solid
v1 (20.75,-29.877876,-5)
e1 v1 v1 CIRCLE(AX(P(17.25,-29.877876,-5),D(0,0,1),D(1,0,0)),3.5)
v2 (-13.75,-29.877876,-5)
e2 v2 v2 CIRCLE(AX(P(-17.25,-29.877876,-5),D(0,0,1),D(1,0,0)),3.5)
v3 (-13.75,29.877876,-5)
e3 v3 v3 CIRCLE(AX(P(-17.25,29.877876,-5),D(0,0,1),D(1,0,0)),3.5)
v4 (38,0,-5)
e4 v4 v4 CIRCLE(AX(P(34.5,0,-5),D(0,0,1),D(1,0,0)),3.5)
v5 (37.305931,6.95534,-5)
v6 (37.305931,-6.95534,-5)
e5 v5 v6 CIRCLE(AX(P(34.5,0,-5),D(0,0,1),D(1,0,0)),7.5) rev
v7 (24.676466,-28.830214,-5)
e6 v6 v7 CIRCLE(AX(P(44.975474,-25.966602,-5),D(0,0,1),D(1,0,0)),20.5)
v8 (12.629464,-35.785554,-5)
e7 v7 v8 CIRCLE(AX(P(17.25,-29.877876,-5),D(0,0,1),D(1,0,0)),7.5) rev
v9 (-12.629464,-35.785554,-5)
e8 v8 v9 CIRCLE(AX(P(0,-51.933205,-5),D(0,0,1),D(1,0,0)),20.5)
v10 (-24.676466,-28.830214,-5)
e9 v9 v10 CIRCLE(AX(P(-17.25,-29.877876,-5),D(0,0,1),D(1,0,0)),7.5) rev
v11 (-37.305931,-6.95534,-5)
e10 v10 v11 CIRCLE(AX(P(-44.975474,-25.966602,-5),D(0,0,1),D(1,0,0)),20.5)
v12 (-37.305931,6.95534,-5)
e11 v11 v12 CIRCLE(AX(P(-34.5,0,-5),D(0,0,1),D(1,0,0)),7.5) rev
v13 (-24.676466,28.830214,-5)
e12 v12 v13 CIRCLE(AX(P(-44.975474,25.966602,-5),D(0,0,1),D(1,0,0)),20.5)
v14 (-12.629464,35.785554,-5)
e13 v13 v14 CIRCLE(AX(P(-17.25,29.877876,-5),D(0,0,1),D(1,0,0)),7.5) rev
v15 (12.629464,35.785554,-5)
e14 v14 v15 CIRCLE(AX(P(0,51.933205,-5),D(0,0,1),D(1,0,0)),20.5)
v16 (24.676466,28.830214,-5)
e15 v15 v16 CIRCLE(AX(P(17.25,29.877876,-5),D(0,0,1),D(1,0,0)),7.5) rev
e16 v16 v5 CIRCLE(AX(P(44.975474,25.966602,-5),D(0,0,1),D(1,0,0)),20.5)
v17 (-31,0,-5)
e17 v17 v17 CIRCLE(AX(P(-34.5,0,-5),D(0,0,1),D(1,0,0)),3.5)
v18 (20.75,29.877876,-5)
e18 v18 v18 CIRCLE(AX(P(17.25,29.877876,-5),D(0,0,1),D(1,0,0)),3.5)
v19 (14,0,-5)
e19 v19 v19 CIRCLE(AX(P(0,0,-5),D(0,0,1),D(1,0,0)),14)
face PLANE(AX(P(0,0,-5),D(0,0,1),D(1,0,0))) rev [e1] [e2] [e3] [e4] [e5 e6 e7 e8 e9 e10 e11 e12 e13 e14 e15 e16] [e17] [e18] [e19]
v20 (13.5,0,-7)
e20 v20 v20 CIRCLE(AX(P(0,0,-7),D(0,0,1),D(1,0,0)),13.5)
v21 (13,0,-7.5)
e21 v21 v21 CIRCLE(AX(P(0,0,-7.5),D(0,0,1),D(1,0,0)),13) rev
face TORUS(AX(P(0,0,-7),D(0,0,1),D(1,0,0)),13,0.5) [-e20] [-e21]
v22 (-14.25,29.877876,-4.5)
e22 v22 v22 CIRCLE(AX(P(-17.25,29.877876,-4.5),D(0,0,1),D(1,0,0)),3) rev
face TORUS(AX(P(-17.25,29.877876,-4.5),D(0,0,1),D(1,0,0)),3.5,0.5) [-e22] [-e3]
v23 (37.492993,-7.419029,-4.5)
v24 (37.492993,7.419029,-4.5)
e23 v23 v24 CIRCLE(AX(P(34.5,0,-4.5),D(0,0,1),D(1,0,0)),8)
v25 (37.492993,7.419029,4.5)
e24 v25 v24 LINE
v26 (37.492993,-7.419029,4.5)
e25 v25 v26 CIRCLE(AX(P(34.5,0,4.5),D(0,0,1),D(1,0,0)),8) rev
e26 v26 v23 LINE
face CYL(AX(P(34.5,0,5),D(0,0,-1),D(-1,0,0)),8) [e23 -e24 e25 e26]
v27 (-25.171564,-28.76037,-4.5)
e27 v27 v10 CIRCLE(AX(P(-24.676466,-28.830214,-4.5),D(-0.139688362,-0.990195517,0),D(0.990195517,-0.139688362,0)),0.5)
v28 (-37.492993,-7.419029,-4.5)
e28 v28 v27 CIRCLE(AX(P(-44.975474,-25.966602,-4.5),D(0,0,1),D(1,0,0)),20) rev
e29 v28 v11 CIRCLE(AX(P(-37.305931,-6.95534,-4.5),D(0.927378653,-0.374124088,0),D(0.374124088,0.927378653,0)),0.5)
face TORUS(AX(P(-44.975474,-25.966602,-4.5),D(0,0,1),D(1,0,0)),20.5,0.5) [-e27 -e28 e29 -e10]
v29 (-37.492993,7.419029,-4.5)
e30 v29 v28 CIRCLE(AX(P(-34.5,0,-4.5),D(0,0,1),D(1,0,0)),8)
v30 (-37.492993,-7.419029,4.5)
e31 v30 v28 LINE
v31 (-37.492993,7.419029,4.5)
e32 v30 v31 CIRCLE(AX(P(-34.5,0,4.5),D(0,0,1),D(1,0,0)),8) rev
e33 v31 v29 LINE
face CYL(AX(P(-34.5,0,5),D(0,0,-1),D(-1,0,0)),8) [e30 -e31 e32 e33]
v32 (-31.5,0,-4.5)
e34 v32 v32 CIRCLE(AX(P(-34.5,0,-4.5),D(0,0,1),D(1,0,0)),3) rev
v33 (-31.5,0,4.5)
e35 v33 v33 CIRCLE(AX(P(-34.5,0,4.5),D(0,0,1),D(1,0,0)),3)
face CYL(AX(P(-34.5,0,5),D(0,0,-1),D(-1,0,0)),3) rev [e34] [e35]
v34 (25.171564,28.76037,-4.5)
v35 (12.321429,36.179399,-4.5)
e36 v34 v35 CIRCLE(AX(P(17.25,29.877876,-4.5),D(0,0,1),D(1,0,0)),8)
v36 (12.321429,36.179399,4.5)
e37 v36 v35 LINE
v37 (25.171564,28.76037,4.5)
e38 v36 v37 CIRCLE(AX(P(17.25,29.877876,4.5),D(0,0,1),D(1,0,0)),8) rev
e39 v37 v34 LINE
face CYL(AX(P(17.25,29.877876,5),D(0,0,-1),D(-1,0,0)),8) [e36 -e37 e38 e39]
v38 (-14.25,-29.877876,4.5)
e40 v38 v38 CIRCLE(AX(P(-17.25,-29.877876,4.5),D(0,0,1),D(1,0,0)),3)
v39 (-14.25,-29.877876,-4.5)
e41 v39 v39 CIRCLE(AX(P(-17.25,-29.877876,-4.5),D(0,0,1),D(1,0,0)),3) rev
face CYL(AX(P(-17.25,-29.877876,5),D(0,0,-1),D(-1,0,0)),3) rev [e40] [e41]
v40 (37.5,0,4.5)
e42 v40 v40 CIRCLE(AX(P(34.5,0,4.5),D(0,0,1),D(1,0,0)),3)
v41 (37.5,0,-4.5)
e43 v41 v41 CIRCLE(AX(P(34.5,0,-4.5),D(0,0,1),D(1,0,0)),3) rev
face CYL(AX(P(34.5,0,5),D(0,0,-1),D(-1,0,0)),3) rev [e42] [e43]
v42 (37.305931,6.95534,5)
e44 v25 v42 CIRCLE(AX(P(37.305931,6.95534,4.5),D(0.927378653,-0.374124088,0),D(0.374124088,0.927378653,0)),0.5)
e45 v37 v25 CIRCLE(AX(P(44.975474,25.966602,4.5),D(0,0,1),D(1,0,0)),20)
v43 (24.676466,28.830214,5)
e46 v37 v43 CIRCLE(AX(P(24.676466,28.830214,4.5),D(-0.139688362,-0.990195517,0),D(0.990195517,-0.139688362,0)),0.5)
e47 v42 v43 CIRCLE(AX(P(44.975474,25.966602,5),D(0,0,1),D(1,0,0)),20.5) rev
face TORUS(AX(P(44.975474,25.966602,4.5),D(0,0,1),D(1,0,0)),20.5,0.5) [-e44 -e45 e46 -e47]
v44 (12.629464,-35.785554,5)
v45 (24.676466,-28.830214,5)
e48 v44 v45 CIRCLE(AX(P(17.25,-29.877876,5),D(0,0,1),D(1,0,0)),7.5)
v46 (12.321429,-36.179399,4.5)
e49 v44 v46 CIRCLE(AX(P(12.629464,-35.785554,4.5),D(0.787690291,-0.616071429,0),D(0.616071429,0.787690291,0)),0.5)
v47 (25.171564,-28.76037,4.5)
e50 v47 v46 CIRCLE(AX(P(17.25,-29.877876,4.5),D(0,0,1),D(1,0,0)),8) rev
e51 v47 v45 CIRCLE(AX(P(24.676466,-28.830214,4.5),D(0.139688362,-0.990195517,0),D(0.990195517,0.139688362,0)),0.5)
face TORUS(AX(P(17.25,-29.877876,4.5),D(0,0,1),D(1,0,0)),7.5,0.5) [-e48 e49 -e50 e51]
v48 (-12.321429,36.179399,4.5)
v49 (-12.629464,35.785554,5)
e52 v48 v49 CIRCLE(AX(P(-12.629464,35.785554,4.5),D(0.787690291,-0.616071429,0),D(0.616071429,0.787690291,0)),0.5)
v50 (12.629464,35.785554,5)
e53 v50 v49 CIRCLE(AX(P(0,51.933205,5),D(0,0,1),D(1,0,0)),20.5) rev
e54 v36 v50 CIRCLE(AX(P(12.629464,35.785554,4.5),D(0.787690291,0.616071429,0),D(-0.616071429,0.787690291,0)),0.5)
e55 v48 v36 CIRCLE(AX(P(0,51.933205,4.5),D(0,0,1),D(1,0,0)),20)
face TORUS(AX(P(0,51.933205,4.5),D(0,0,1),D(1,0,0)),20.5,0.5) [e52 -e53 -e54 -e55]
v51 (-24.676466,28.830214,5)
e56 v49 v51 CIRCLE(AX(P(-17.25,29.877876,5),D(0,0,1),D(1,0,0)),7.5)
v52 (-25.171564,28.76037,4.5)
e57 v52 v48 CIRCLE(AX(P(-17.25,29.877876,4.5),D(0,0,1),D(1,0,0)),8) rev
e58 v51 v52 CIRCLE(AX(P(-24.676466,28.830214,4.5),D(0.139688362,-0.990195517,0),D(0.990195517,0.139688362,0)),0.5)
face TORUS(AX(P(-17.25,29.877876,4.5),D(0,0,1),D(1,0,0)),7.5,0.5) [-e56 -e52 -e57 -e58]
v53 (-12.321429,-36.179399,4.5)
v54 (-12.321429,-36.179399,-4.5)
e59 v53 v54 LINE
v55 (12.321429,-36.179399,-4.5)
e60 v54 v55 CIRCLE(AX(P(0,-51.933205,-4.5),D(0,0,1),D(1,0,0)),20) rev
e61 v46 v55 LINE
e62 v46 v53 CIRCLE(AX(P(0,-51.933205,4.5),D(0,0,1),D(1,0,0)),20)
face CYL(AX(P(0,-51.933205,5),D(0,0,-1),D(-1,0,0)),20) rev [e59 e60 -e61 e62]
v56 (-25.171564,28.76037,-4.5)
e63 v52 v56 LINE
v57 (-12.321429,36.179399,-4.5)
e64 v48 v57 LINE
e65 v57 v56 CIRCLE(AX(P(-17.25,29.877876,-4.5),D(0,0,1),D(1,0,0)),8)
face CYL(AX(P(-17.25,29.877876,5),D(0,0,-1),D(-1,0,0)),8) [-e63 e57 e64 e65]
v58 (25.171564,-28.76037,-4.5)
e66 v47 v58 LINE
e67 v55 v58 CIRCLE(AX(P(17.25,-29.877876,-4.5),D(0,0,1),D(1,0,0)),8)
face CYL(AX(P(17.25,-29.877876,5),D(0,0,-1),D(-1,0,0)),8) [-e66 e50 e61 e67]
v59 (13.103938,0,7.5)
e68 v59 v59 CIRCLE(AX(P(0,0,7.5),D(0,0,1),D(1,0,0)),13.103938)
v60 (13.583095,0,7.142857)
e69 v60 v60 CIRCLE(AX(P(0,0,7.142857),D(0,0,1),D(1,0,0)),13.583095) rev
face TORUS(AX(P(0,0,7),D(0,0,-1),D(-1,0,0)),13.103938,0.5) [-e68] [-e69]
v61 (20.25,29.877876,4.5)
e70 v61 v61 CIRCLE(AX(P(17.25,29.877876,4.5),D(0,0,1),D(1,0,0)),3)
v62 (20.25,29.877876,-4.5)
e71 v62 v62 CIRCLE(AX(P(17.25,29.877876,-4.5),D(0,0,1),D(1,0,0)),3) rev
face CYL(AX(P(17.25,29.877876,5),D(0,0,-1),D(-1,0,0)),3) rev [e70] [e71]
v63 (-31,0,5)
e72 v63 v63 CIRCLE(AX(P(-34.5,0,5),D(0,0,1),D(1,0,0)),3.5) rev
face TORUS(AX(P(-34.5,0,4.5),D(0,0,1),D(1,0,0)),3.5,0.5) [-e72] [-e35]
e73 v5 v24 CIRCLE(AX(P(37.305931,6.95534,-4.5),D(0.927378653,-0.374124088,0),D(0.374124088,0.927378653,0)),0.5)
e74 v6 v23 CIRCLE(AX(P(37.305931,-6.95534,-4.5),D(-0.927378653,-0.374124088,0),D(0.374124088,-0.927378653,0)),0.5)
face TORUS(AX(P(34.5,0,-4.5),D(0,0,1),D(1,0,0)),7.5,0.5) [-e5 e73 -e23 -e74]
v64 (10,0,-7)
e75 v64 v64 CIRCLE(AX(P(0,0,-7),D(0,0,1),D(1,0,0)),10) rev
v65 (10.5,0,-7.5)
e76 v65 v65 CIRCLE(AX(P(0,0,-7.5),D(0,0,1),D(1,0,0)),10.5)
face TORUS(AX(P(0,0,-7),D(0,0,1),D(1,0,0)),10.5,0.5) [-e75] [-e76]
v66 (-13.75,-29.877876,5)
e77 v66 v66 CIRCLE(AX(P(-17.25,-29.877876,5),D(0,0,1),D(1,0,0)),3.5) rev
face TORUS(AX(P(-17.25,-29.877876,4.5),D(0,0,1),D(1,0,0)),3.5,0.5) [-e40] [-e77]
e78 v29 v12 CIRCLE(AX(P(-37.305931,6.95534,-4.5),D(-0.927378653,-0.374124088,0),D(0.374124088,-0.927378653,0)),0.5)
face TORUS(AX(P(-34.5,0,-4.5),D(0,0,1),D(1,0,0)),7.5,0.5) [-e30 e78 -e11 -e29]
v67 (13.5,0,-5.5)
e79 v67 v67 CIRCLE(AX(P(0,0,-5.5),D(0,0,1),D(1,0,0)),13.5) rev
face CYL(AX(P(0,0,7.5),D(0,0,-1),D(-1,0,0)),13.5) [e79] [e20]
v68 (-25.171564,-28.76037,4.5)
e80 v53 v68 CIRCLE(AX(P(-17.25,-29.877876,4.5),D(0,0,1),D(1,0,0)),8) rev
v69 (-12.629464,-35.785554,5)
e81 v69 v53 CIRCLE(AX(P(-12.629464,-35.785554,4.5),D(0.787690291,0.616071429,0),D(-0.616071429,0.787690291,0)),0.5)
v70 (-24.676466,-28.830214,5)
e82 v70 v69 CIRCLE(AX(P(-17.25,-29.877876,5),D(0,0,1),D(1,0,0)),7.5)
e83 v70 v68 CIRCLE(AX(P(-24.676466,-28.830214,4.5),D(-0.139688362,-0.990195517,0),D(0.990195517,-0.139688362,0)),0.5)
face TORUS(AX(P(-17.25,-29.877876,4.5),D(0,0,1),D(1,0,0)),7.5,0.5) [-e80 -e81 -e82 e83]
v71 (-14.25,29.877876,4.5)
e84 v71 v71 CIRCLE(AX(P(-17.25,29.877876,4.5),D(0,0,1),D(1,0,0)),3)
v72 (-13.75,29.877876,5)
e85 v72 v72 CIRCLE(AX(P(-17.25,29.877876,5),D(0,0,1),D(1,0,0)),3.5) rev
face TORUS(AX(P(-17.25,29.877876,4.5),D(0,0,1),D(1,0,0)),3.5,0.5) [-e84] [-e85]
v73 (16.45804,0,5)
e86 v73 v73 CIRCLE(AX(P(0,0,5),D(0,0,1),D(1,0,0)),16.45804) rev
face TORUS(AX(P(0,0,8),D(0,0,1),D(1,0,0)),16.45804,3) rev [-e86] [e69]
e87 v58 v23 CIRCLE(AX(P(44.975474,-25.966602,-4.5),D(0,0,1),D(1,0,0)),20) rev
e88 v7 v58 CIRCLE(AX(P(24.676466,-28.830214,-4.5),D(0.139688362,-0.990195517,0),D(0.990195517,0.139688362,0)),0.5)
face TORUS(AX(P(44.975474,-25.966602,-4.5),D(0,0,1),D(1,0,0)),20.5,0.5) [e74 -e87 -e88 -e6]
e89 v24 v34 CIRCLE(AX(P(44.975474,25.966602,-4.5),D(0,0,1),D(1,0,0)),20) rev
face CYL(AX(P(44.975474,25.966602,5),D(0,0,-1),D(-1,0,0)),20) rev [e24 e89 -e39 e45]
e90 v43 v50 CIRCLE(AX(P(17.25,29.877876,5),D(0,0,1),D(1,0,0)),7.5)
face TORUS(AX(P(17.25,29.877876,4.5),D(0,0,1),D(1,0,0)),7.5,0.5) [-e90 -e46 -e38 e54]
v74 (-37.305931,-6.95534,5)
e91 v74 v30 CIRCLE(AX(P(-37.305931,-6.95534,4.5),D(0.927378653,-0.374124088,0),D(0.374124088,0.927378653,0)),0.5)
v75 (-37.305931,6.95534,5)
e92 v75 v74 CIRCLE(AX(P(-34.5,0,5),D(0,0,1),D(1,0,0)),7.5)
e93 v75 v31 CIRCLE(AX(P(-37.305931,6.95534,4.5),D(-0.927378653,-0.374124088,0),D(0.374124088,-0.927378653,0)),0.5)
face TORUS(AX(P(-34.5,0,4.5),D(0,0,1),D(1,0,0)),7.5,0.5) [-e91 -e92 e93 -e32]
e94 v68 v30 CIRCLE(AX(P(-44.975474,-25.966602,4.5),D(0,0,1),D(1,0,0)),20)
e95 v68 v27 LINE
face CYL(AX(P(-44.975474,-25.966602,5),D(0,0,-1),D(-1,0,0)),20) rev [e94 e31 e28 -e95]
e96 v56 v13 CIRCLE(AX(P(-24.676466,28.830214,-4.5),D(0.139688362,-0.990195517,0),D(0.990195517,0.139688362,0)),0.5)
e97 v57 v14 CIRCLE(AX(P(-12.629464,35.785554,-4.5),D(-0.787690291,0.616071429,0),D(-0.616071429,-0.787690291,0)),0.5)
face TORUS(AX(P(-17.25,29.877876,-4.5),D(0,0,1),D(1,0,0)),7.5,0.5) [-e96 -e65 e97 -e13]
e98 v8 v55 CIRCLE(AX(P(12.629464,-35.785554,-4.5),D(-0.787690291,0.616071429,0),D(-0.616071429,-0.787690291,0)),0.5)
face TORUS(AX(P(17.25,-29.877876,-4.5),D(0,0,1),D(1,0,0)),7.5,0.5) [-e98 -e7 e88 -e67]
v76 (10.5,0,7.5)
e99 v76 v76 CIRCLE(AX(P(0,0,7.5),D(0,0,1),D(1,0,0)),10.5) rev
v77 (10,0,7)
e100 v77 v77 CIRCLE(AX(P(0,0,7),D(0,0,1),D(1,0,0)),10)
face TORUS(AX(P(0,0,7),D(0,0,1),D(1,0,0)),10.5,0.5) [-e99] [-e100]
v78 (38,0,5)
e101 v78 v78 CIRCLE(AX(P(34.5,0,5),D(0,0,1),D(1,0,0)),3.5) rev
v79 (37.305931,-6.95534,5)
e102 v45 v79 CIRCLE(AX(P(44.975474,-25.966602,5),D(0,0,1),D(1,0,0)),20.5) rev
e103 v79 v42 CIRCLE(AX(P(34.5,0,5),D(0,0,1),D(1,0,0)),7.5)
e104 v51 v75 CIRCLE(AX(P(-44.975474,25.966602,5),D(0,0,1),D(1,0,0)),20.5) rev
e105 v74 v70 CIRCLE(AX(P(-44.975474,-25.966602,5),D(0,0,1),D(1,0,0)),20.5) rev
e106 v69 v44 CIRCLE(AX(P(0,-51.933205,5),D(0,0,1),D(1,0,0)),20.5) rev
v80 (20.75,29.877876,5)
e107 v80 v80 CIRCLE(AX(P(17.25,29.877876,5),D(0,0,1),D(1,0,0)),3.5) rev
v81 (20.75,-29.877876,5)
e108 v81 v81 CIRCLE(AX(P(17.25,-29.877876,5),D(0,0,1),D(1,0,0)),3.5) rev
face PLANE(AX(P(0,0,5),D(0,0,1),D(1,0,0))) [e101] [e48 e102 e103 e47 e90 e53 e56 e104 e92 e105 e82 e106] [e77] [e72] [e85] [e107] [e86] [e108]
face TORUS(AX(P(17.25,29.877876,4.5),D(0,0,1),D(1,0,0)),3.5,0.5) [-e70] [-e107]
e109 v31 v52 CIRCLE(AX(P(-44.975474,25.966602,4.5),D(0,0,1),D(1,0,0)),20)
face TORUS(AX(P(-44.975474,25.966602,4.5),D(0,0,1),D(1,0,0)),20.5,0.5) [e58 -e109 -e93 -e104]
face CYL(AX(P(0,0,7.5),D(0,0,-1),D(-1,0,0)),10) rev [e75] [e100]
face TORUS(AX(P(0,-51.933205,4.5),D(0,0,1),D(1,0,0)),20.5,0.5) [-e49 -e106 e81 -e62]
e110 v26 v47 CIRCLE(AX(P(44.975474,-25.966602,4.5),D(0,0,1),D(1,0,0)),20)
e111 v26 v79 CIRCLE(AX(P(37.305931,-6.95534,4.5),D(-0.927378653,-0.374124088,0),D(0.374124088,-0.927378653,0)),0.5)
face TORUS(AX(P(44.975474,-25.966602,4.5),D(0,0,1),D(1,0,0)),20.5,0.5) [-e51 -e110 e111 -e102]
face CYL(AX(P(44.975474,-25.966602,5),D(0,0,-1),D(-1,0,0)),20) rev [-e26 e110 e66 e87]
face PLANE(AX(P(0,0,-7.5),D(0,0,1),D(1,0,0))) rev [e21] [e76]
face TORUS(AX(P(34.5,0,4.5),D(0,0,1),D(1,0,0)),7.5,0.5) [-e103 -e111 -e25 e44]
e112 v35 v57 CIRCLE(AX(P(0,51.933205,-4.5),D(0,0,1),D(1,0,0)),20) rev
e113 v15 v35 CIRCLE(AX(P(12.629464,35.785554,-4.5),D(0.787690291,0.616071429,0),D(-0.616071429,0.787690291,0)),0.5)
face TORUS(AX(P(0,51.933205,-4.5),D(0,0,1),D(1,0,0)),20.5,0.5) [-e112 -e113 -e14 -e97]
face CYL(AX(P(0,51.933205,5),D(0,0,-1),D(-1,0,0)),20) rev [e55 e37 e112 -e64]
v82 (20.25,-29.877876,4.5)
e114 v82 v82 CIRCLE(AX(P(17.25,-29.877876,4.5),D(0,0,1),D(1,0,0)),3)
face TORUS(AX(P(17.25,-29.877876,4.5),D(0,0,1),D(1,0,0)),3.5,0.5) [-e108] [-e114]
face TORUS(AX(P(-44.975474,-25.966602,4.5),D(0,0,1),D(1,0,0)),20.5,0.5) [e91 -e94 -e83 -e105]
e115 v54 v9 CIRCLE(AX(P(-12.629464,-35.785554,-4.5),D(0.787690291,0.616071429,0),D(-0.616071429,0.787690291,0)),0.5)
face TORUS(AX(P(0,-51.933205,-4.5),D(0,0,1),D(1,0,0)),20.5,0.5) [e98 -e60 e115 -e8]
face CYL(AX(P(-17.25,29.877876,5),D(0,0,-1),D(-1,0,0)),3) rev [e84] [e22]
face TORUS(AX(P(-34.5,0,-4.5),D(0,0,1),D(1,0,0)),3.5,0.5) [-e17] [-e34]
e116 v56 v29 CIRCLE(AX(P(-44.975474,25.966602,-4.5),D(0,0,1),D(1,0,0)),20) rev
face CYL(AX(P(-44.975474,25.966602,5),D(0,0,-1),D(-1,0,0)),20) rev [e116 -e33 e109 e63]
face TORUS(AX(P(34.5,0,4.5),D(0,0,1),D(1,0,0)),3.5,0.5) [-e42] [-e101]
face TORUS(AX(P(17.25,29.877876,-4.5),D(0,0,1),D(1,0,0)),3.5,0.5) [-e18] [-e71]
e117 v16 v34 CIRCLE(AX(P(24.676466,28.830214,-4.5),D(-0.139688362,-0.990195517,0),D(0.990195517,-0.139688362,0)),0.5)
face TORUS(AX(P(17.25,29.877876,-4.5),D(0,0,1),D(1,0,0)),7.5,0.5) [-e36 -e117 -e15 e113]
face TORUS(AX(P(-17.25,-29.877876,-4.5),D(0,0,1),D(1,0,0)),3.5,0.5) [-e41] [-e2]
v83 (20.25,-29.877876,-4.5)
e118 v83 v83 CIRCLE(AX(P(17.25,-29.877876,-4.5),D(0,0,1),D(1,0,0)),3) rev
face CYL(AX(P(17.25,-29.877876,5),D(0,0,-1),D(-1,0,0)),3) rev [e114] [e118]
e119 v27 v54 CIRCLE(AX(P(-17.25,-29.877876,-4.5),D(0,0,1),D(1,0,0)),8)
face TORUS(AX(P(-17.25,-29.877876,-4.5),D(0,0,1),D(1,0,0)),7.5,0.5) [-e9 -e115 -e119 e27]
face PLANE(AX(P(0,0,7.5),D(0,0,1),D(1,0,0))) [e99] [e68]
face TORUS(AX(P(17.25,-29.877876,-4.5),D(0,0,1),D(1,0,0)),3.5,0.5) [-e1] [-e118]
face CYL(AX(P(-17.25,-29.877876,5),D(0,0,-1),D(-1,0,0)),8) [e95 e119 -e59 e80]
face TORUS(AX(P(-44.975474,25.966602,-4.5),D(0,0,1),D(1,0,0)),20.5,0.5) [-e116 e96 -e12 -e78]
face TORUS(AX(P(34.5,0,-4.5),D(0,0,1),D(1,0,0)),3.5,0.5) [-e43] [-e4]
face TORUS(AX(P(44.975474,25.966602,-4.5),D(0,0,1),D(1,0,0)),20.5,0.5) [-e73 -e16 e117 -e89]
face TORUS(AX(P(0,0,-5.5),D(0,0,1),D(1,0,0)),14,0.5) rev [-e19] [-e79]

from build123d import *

# Parameters (mm, degrees)
SKETCH1_R           = 13.5
SKETCH1_R_2         = 10
BOSS_EXTRUDE1_DEPTH = 7.5
SKETCH1_7_R         = 13.5
SKETCH1_7_R_2       = 3
BOSS_EXTRUDE2_DEPTH = 5
FILLET1_R           = 3
FILLET2_R           = 0.5


with BuildPart() as part:
    # Sketch1 → Boss-Extrude1 (new, symmetric)
    with BuildSketch(Plane.XY):
        Circle(SKETCH1_R)
        Circle(SKETCH1_R_2, mode=Mode.SUBTRACT)
    extrude(amount=BOSS_EXTRUDE1_DEPTH, both=True)

    # Sketch1<7> → Boss-Extrude2 (add, symmetric)
    with BuildSketch(Plane.XY):
        with BuildLine():
            ThreePointArc((-12.321428571, 36.17939876), (0, 31.933204585), (12.321428571, 36.17939876))
            ThreePointArc((12.321428571, 36.17939876), (21.25, 36.806079661), (25.171564134, 28.760369534))
            ThreePointArc((25.171564134, 28.760369534), (27.654966395, 15.966602293), (37.492992706, 7.419029226))
            ThreePointArc((37.492992706, 7.419029226), (42.5, 0), (37.492992706, -7.419029226))
            ThreePointArc((37.492992706, -7.419029226), (27.654966395, -15.966602293), (25.171564134, -28.760369534))
            ThreePointArc((25.171564134, -28.760369534), (21.25, -36.806079661), (12.321428571, -36.17939876))
            ThreePointArc((12.321428571, -36.17939876), (0, -31.933204585), (-12.321428571, -36.17939876))
            ThreePointArc((-12.321428571, -36.17939876), (-21.25, -36.806079661), (-25.171564134, -28.760369534))
            ThreePointArc((-25.171564134, -28.760369534), (-27.654966395, -15.966602293), (-37.492992706, -7.419029226))
            ThreePointArc((-37.492992706, -7.419029226), (-42.5, 0), (-37.492992706, 7.419029226))
            ThreePointArc((-37.492992706, 7.419029226), (-27.654966395, 15.966602293), (-25.171564134, 28.760369534))
            ThreePointArc((-25.171564134, 28.760369534), (-21.25, 36.806079661), (-12.321428571, 36.17939876))
        make_face()
        Circle(SKETCH1_7_R, mode=Mode.SUBTRACT)
        with Locations((17.25, 29.877876431)):
            Circle(SKETCH1_7_R_2, mode=Mode.SUBTRACT)
        with Locations((-17.25, 29.877876431)):
            Circle(SKETCH1_7_R_2, mode=Mode.SUBTRACT)
        with Locations((-34.5, 0)):
            Circle(SKETCH1_7_R_2, mode=Mode.SUBTRACT)
        with Locations((-17.25, -29.877876431)):
            Circle(SKETCH1_7_R_2, mode=Mode.SUBTRACT)
        with Locations((17.25, -29.877876431)):
            Circle(SKETCH1_7_R_2, mode=Mode.SUBTRACT)
        with Locations((34.5, 0)):
            Circle(SKETCH1_7_R_2, mode=Mode.SUBTRACT)
    extrude(amount=BOSS_EXTRUDE2_DEPTH, both=True)

    # Fillet1
    # the kernel refuses this fillet: 3 mm, written as the material it adds along each edge
    with BuildSketch(Plane(origin=(0, 0, 5), x_dir=(1, 0, 0), z_dir=(0, -1, 0))) as fillet1_piece_1:
        with BuildLine():
            CenterArc((16.458039892, 3), FILLET1_R, 189.594068227, 80.405931773)
            Line((13.5, 2.5), (13.440839202, 2.49))
            ThreePointArc((13.440839202, 2.49), (13.44, 1.25), (13.44, 0))
            Line((13.44, 0), (13.5, -0.06))
            Line((13.5, -0.06), (16.458039892, -0.06))
            Line((16.458039892, -0.06), (16.458039892, 0))
        make_face()
    revolve(axis=Axis((0, 0, 5), (0, 0, 1)))

    # Fillet2
    fillet2_edges = [part.edges().sort_by_distance(p)[0] for p in [
        (0, 31.933204585, 5),
        (-21.25, 36.806079661, -5),
        (-27.654966395, 15.966602293, 5),
        (-42.5, 0, -5),
        (-13.5, 0, 7.5),
        (-27.654966395, -15.966602293, 5),
        (-21.25, -36.806079661, -5),
        (0, -31.933204585, 5),
        (21.25, -36.806079661, -5),
        (27.654966395, -15.966602293, 5),
        (42.5, 0, -5),
        (27.654966395, 15.966602293, 5),
        (14.25, -29.877876431, 5),
        (-20.25, -29.877876431, 5),
        (-37.5, 0, 5),
        (-20.25, 29.877876431, 5),
        (14.25, 29.877876431, 5),
        (21.25, 36.806079661, -5),
        (31.5, 0, 5),
        (-21.25, 36.806079661, 5),
        (-42.5, 0, 5),
        (-21.25, -36.806079661, 5),
        (21.25, -36.806079661, 5),
        (42.5, 0, 5),
        (21.25, 36.806079661, 5),
        (0, 31.933204585, -5),
        (27.654966395, 15.966602293, -5),
        (27.654966395, -15.966602293, -5),
        (0, -31.933204585, -5),
        (-27.654966395, -15.966602293, -5),
        (-27.654966395, 15.966602293, -5),
        (14.25, 29.877876431, -5),
        (-20.25, 29.877876431, -5),
        (-37.5, 0, -5),
        (-20.25, -29.877876431, -5),
        (14.25, -29.877876431, -5),
        (31.5, 0, -5),
        (-13.5, 0, -7.5),
        (-10, 0, -7.5),
        (-10, 0, 7.5),
        (-13.5, 0, -5),
    ]]
    fillet(fillet2_edges, radius=FILLET2_R)


solid = part.part
